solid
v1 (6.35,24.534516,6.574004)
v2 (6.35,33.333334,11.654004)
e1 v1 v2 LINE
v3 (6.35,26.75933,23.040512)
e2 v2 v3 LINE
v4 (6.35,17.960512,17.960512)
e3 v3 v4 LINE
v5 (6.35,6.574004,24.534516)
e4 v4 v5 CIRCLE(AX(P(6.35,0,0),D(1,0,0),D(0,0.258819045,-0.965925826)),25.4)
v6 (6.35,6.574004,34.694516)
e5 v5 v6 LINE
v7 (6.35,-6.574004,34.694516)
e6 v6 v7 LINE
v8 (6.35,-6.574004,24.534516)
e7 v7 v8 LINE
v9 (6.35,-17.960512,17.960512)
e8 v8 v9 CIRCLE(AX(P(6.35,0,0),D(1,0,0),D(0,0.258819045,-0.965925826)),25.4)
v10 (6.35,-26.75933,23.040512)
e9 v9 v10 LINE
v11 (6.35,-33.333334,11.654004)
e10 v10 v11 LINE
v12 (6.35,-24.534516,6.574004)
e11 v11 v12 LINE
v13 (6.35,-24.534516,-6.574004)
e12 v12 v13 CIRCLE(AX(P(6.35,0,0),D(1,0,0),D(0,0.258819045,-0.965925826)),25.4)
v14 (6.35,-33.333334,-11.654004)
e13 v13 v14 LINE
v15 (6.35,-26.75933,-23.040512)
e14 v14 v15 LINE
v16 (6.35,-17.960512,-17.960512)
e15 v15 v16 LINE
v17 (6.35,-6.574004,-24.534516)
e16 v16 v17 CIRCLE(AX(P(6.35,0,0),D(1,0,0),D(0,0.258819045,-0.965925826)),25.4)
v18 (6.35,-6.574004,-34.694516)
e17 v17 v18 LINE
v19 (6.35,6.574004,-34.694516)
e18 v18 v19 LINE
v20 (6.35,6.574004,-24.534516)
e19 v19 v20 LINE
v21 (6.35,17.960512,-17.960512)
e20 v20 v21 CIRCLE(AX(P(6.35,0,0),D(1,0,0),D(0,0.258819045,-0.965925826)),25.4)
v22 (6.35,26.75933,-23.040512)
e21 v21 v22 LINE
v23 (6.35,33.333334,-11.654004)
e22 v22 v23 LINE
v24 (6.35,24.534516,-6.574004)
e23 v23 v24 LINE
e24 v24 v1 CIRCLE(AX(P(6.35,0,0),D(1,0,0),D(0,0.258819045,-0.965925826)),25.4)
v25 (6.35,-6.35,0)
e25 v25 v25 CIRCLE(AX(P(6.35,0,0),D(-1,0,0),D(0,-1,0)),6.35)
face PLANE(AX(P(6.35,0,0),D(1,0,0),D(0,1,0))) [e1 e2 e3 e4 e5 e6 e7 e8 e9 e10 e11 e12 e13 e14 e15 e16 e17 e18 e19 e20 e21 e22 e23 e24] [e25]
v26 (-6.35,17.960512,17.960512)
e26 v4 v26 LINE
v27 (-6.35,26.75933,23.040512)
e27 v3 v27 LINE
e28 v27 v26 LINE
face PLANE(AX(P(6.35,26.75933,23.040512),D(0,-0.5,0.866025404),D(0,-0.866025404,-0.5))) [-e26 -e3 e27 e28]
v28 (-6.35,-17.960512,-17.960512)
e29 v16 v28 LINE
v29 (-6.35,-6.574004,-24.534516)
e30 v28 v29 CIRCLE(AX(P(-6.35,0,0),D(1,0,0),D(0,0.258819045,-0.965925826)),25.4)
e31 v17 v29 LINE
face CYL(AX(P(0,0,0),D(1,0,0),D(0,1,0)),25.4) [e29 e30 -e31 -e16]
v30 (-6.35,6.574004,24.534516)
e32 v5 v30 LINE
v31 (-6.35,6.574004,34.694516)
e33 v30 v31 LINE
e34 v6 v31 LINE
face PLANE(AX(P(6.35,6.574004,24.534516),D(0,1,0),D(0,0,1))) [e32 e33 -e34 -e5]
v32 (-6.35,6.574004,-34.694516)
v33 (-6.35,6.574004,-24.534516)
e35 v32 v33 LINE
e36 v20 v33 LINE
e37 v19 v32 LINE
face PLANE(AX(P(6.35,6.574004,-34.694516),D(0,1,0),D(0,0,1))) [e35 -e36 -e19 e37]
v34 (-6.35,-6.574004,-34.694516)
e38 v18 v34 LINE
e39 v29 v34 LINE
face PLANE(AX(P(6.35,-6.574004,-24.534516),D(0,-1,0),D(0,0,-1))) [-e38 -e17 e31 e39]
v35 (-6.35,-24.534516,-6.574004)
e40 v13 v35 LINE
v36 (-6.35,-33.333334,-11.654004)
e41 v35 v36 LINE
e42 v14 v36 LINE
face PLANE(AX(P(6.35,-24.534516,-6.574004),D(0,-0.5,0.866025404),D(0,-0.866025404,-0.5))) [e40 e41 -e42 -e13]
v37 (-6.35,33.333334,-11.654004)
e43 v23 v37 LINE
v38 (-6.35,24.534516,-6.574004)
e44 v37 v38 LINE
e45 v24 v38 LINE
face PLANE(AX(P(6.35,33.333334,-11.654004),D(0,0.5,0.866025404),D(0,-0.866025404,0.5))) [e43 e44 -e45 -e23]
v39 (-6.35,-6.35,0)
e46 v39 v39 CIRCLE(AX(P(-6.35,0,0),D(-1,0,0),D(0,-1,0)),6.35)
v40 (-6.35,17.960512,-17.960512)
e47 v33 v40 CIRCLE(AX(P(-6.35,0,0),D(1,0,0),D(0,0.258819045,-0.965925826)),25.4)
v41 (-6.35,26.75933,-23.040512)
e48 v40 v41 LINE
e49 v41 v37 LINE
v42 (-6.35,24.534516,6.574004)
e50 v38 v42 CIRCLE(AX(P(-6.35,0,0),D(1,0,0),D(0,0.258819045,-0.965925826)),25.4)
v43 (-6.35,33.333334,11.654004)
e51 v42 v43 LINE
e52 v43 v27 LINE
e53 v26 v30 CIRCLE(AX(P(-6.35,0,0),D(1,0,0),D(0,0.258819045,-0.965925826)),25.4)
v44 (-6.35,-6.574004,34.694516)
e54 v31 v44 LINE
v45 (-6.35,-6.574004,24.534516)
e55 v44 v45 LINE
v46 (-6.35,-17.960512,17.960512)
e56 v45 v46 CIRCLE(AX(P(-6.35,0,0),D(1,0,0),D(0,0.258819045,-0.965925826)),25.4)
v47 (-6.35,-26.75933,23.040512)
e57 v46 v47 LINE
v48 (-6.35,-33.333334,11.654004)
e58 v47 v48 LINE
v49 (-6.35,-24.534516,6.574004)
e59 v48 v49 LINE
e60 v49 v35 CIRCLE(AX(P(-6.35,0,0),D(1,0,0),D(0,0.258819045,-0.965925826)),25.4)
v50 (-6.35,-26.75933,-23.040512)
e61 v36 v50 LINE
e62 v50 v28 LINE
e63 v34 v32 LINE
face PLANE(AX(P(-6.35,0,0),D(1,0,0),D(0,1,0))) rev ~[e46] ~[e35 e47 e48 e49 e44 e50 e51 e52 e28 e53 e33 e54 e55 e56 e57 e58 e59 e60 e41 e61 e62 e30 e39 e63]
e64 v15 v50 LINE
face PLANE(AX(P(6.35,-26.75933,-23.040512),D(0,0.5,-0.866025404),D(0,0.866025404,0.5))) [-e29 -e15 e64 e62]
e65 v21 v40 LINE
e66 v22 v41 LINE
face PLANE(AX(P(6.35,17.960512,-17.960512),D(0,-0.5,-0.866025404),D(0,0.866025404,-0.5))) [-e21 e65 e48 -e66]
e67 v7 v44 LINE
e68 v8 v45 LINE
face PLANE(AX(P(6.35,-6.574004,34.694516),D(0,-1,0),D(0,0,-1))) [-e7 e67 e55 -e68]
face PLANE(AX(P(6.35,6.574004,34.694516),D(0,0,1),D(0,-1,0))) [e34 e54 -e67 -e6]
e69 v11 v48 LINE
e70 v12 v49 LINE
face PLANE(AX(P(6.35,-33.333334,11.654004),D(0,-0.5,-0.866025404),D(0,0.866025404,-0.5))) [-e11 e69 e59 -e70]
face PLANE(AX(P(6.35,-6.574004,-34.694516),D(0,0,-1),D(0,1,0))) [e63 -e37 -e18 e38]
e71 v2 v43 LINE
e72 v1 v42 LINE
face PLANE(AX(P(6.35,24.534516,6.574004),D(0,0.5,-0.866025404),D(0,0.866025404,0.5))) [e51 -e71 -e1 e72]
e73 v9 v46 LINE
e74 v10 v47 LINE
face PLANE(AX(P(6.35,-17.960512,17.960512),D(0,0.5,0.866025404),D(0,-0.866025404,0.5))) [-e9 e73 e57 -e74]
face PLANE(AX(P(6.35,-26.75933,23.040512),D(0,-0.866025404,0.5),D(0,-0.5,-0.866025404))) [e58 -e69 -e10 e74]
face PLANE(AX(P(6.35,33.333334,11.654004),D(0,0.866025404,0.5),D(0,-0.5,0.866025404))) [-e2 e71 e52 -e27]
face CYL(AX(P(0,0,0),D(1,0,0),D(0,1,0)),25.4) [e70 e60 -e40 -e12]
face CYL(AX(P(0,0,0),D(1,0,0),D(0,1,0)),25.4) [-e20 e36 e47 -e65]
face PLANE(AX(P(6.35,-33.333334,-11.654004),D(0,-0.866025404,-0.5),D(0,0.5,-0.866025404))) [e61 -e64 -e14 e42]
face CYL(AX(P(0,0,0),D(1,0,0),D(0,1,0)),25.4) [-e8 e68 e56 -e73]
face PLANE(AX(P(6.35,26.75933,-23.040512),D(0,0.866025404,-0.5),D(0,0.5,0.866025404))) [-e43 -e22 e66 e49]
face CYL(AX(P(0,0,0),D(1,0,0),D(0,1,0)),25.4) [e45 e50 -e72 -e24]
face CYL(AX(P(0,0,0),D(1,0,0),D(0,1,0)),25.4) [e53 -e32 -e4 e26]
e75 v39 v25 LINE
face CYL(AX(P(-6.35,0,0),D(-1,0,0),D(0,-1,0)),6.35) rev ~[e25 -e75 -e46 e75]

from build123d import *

# Parameters (mm, degrees)
F0_R     = 25.4
F1_DEPTH = 6.35
F3_DEPTH = 12.7
F5_COUNT = 6
F6_R     = 6.35
F7_DEPTH = 25.4


# Not quite as in the source:
# - a feature names something its author has since deleted; it is built from what else it names


with BuildPart() as f1:
    # F0 (on Right) → F1 (new body, symmetric)
    with BuildSketch(Plane.YZ):
        Circle(F0_R)
    extrude(amount=F1_DEPTH, both=True)

    # F2 (on face) → F3 (join)
    with BuildSketch(Plane.YZ.offset(6.35)):
        Polygon((6.5740037456, -24.5345159877), (0, 0), (0, -24.5345159877), align=None)
        Polygon((0, -24.5345159877), (0, 0), (-6.5740037456, -24.5345159877), align=None)
        Polygon((6.5740037456, -24.5345159877), (0, -24.5345159877), (-6.5740037456, -24.5345159877), (-6.5740037456, -34.6945159877), (6.5740037456, -34.6945159877), align=None)
    extrude(amount=-F3_DEPTH)

    # F5: F1 ×6 about axis
    f5_axis = Axis((25.0397827476, 0, 0), (1, 0, 0))


with BuildPart() as f1_1:
    add(f1.part)
    for i in range(1, F5_COUNT):
        add(f1.part.rotate(f5_axis, i * 360 / F5_COUNT))

    # F6 (on face) → F7 (cut)
    with BuildSketch(Plane(origin=(-6.35, 0, 0), x_dir=(0, -1, 0), z_dir=(-1, 0, 0))):
        Circle(F6_R)
    extrude(amount=-F7_DEPTH, mode=Mode.SUBTRACT)


solid = f1_1.part
